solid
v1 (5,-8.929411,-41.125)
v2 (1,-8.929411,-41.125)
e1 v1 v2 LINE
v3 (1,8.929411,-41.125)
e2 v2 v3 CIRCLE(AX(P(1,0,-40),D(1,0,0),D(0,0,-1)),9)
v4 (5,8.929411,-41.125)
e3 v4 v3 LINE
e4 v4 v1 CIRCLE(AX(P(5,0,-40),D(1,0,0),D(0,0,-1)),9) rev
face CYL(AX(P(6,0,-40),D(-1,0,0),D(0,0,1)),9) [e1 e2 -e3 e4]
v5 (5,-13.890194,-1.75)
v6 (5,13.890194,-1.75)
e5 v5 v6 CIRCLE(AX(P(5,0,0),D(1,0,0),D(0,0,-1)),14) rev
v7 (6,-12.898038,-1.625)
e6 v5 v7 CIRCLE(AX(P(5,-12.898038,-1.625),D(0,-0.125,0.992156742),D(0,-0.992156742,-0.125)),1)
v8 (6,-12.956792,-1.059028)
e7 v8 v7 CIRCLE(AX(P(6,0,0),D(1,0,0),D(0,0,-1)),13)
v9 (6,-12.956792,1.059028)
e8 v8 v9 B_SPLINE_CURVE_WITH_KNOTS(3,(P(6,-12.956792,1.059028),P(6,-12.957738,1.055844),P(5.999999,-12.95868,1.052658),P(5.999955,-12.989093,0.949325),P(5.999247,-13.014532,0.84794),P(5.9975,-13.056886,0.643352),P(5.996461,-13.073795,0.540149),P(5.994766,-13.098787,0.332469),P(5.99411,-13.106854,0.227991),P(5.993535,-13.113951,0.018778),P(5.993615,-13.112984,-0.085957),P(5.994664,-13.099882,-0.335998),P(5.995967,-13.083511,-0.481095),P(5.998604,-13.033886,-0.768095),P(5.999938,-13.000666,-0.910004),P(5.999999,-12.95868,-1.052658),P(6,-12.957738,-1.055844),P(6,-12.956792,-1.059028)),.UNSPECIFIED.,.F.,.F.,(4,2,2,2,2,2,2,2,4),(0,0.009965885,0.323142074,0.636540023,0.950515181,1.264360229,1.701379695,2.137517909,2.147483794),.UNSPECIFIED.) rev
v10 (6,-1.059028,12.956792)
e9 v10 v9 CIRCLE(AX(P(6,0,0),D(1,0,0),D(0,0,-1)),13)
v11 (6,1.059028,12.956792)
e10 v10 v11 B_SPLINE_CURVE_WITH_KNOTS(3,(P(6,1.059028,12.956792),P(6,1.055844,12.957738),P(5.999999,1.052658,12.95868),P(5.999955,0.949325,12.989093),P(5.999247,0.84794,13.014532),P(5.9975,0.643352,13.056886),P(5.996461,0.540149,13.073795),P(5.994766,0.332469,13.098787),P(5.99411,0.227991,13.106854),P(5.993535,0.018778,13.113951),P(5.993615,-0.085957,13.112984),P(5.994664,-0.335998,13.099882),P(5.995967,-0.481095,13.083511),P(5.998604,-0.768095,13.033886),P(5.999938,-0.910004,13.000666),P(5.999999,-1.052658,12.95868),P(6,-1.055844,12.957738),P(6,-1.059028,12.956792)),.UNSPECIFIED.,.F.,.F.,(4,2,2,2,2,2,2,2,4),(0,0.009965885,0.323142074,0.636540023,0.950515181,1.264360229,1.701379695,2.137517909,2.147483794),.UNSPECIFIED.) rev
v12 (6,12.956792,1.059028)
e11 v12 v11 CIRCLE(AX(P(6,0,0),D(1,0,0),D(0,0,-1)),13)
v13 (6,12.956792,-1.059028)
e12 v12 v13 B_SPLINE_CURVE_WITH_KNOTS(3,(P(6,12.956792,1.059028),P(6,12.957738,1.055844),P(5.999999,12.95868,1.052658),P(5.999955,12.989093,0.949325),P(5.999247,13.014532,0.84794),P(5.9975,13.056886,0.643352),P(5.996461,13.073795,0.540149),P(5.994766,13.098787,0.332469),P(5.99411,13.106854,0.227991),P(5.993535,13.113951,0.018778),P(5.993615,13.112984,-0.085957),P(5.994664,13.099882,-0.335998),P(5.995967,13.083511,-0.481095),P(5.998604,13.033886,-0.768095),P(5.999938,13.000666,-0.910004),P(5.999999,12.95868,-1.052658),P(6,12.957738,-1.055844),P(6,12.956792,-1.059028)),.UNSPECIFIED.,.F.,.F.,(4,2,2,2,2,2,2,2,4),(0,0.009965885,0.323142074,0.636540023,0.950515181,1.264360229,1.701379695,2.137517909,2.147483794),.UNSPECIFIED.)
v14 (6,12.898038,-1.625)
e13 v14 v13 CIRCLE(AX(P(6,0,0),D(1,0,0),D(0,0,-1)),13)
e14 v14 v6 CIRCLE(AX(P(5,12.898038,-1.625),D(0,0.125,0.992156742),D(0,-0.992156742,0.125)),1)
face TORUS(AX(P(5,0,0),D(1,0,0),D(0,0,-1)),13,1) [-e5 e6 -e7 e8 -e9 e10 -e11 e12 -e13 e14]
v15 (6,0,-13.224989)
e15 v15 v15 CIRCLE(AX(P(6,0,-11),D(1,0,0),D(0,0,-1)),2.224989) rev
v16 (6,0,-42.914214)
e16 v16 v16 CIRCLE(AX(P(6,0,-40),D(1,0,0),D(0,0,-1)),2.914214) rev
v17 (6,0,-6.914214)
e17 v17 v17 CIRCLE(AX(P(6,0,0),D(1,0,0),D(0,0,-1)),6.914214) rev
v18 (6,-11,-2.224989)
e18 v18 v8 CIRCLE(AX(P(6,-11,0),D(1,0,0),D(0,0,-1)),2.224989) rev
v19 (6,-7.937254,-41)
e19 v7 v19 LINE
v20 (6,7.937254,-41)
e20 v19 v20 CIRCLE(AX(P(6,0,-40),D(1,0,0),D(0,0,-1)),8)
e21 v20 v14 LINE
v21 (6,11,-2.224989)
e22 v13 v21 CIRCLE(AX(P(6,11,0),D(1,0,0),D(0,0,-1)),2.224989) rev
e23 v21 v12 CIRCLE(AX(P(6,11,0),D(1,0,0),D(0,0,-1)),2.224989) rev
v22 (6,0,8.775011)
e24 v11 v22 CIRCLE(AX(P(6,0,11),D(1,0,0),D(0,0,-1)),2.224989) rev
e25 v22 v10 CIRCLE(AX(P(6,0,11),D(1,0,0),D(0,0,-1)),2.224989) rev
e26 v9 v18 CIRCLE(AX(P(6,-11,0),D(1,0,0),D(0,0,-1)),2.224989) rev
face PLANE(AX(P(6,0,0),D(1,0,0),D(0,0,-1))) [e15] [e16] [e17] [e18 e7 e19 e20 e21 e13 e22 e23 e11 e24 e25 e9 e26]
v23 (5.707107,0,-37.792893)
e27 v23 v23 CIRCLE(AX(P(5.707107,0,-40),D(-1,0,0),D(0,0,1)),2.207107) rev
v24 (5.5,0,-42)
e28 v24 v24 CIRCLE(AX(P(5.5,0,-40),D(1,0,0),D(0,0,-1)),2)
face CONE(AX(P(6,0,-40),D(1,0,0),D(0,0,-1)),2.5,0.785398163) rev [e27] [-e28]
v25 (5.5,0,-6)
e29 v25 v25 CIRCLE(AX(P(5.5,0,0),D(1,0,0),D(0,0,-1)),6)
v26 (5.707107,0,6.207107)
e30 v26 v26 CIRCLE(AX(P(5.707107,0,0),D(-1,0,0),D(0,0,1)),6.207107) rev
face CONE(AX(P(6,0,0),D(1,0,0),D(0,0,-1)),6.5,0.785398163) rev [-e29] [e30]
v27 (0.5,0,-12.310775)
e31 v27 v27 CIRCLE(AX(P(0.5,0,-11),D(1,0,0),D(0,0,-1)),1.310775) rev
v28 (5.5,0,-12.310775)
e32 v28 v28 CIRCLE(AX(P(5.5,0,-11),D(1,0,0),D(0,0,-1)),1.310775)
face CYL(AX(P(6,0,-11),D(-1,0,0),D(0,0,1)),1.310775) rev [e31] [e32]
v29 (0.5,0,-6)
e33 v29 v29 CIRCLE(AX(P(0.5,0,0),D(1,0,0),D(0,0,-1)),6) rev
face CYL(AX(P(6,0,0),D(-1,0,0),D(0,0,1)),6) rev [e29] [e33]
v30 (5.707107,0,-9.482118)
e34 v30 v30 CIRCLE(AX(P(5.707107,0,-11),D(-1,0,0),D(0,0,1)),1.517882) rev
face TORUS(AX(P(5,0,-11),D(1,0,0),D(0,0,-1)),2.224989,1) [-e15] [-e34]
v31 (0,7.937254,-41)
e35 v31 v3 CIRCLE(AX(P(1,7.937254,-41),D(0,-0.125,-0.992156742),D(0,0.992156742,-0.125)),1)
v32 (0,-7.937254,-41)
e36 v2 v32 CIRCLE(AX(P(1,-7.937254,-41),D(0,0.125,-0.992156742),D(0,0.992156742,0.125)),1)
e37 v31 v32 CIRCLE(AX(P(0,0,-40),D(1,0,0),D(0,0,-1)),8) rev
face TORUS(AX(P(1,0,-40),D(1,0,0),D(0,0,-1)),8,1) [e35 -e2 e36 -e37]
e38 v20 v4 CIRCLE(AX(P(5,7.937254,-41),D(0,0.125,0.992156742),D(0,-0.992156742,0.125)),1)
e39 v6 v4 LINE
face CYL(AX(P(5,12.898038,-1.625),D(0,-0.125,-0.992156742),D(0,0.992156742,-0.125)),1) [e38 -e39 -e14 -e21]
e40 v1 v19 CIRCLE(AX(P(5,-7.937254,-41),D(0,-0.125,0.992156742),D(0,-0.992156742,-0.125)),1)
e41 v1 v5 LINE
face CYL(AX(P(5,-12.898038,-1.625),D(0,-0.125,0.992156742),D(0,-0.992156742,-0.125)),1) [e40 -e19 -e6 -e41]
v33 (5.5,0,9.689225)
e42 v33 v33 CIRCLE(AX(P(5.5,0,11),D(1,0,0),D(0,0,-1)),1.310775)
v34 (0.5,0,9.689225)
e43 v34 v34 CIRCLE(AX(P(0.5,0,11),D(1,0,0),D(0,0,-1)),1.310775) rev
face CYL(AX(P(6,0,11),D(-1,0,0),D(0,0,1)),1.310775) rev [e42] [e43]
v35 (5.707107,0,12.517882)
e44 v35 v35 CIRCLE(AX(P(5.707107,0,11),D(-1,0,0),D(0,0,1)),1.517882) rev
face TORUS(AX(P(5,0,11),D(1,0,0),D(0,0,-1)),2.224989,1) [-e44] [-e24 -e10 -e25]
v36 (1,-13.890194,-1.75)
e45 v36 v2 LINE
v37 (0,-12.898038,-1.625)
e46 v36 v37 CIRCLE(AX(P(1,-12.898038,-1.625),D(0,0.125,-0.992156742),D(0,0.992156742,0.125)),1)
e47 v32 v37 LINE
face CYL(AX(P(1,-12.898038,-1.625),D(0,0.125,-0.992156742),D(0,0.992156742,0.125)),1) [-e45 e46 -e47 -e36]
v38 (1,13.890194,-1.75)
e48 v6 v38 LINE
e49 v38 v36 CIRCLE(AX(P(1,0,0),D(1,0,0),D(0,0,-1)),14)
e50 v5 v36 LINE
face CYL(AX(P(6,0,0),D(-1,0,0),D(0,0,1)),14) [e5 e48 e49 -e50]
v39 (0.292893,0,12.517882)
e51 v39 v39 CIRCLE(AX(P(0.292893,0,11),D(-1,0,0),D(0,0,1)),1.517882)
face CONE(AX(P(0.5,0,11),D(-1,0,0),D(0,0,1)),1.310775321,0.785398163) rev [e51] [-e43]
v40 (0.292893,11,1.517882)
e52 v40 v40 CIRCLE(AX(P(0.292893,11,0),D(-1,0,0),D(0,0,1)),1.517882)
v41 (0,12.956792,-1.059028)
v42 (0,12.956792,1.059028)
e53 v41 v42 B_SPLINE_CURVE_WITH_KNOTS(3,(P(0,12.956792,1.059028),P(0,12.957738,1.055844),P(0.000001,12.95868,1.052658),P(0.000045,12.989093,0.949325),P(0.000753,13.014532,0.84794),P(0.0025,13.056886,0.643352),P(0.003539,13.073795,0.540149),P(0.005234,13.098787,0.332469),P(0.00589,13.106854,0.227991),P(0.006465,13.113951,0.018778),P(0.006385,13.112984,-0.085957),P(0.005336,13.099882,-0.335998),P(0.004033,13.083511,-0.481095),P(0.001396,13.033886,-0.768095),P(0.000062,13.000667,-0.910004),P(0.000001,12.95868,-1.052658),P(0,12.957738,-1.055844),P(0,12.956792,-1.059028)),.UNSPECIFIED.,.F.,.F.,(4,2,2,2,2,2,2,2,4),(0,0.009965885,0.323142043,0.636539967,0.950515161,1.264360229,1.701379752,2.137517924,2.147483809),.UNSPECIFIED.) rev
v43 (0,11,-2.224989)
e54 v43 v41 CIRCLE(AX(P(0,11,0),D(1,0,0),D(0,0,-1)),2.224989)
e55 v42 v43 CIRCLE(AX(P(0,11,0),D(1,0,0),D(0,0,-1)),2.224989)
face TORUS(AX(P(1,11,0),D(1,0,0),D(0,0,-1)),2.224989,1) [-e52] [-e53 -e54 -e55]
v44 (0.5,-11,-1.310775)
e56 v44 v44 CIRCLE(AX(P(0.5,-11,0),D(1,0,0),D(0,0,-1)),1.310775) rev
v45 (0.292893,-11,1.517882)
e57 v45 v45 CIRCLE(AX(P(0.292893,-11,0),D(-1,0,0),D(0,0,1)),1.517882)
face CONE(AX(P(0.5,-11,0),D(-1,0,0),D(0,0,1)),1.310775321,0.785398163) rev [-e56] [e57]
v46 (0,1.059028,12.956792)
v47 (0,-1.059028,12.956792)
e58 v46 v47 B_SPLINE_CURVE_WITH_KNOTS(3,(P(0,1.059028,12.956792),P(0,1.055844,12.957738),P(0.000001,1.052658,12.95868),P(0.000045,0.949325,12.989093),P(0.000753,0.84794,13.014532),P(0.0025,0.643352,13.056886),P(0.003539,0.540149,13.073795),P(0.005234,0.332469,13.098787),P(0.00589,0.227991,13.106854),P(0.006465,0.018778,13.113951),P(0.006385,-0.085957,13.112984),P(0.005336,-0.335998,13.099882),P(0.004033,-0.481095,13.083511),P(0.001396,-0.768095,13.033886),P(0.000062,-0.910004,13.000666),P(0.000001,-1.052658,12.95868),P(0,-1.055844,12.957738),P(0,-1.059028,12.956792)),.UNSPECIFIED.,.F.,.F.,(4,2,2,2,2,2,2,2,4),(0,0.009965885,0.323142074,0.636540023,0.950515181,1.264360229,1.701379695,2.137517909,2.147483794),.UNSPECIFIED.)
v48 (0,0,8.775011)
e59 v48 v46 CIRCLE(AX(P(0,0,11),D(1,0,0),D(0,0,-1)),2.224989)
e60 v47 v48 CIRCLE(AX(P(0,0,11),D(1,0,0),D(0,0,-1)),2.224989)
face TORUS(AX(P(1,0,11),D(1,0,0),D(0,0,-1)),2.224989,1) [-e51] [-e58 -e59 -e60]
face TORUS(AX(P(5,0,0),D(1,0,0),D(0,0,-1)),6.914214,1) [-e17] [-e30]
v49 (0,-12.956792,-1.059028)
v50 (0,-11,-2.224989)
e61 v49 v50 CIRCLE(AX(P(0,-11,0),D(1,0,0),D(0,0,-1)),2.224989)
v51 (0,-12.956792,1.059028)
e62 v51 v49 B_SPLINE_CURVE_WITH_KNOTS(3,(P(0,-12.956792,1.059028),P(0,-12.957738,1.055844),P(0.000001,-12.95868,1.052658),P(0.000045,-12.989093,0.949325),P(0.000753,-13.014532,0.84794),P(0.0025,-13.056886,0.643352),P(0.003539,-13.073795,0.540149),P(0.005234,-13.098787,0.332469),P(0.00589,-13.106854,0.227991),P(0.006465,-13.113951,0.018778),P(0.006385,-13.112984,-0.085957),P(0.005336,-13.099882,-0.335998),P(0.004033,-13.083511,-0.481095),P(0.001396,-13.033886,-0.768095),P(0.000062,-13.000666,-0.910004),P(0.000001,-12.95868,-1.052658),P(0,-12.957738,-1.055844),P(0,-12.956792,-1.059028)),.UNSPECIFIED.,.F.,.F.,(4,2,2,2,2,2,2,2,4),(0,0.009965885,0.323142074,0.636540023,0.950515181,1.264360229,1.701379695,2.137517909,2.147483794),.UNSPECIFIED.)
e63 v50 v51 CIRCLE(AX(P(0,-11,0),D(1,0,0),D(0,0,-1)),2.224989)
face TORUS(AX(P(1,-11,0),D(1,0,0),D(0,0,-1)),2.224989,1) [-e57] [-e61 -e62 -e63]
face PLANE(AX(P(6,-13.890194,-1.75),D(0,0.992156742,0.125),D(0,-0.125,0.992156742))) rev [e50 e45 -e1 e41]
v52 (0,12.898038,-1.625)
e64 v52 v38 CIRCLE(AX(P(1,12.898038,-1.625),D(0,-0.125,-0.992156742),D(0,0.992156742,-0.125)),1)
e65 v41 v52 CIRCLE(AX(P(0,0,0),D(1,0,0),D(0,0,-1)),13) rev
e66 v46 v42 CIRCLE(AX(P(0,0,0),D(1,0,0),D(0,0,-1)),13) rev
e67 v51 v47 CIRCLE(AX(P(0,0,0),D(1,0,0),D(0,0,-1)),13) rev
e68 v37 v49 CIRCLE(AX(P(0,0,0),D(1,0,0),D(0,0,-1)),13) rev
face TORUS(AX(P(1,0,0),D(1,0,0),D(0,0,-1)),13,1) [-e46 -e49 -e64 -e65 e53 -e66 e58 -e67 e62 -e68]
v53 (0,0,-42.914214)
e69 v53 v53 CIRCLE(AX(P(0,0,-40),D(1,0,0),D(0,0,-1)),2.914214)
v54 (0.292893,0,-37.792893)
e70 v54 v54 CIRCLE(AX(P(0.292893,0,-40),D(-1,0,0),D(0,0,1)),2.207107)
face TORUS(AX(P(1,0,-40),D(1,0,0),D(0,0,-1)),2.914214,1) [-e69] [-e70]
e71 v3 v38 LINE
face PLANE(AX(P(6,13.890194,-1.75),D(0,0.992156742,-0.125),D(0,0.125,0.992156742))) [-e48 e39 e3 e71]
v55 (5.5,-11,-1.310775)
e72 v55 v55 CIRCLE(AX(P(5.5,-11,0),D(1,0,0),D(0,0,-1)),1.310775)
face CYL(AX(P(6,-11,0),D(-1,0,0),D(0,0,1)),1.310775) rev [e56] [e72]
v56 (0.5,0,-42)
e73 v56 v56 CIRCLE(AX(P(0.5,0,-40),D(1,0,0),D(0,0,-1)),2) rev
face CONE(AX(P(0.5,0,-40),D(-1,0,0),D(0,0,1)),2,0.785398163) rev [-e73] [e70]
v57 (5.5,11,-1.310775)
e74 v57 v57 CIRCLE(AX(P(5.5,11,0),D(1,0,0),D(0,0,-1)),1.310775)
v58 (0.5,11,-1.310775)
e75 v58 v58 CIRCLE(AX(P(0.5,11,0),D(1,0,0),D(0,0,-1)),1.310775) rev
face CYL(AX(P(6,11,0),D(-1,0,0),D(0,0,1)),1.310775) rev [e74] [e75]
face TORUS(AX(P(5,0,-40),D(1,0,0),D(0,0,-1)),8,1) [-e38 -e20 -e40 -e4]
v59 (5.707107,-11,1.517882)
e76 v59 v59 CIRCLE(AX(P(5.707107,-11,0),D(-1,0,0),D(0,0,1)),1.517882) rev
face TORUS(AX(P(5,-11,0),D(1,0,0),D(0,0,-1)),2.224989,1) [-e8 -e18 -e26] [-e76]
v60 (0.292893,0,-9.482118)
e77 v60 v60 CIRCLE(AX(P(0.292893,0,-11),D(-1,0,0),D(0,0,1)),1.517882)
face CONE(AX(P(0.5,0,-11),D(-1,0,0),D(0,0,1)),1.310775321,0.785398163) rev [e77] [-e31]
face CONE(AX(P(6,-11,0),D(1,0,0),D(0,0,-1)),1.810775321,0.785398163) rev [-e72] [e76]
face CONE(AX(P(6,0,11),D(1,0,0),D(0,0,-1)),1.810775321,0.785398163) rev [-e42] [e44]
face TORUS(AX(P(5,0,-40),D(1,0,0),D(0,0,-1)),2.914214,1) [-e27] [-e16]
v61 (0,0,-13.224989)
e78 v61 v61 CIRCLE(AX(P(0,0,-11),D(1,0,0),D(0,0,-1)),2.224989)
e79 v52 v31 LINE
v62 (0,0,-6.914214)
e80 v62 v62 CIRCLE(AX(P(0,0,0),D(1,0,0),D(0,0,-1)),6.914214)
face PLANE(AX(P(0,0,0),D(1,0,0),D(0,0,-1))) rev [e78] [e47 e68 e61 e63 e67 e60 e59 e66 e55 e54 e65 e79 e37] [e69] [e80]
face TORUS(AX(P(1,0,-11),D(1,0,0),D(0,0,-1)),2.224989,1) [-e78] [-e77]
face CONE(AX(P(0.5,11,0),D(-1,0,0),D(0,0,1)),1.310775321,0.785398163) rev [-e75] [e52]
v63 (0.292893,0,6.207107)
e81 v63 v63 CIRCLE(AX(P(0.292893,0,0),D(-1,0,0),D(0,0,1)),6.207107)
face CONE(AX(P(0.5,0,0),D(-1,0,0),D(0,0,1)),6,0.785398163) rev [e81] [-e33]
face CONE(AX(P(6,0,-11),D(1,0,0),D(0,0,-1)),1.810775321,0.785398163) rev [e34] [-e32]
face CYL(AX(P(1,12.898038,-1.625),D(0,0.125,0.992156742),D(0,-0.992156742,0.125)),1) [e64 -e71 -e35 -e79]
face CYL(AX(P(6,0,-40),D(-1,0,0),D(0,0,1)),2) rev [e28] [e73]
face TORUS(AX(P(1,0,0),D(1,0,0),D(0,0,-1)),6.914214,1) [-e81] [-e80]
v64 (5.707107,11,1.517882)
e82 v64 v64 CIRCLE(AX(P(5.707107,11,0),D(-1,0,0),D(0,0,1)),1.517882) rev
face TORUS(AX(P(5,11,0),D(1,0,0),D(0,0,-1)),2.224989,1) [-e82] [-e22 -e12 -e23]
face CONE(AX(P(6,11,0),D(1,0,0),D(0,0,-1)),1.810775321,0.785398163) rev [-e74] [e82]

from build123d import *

# Parameters (mm, degrees)
EXTRUDE_1_DEPTH      = 6
SKETCH_2_OUTSIDE_W   = 78.84
SKETCH_2_OUTSIDE_H   = 43.84
SKETCH_2_OUTSIDE_R   = 6
SKETCH_2_OUTSIDE_R_2 = 1.310775321
SKETCH_2_OUTSIDE_R_3 = 2
CUT_EXTRUDE_1_DEPTH  = 52.312766443
CHAMFER_1_SIZE       = 0.5
FILLET_1_R           = 1


with BuildPart() as part:
    # 草图1 → 凸台-拉伸1 (new body)
    with BuildSketch(Plane(origin=(0, 0, 0), x_dir=(0, 0, -1), z_dir=(1, 0, 0))):
        with BuildLine():
            Line((41.125, 8.929410675), (1.75, 13.890194383))
            ThreePointArc((1.75, 13.890194383), (-14, 0), (1.75, -13.890194383))
            Line((1.75, -13.890194383), (41.125, -8.929410675))
            ThreePointArc((41.125, -8.929410675), (49, 0), (41.125, 8.929410675))
        make_face()
    extrude(amount=EXTRUDE_1_DEPTH)

    # 草图2 outside → 切除-拉伸1 (cut, through all)
    # profile 1 of 7: a face of its own
    with BuildSketch(Plane.ZY):
        with Locations((-17.5, 0)):
            Rectangle(SKETCH_2_OUTSIDE_W, SKETCH_2_OUTSIDE_H)
        with BuildLine():
            Line((-41.125, -8.929410675), (-1.75, -13.890194383))
            ThreePointArc((-1.75, -13.890194383), (14, 0), (-1.75, 13.890194383))
            Line((-1.75, 13.890194383), (-41.125, 8.929410675))
            ThreePointArc((-41.125, 8.929410675), (-49, 0), (-41.125, -8.929410675))
        make_face(mode=Mode.SUBTRACT)
    # profile 2 of 7: a face of its own
    with BuildSketch(Plane.ZY):
        Circle(SKETCH_2_OUTSIDE_R)
    # profile 3 of 7: a face of its own
    with BuildSketch(Plane.ZY):
        with Locations((11, 0)):
            Circle(SKETCH_2_OUTSIDE_R_2)
    # profile 4 of 7: a face of its own
    with BuildSketch(Plane.ZY):
        with Locations((0, -11)):
            Circle(SKETCH_2_OUTSIDE_R_2)
    # profile 5 of 7: a face of its own
    with BuildSketch(Plane.ZY):
        with Locations((-11, 0)):
            Circle(SKETCH_2_OUTSIDE_R_2)
    # profile 6 of 7: a face of its own
    with BuildSketch(Plane.ZY):
        with Locations((0, 11)):
            Circle(SKETCH_2_OUTSIDE_R_2)
    # profile 7 of 7: a face of its own
    with BuildSketch(Plane.ZY):
        with Locations((-40, 0)):
            Circle(SKETCH_2_OUTSIDE_R_3)
    extrude(amount=-CUT_EXTRUDE_1_DEPTH, mode=Mode.SUBTRACT)

    # 倒角1
    chamfer_1_edges = [part.edges().sort_by_distance(p)[0] for p in [
        (6, 11, -1.310775321),
        (0, 11, -1.310775321),
        (6, 0, -12.310775321),
        (0, 0, -12.310775321),
        (6, -11, -1.310775321),
        (0, -11, -1.310775321),
        (6, 0, 9.689224679),
        (0, 0, 9.689224679),
        (6, 0, -42),
        (0, 0, -42),
        (6, 0, -6),
        (0, 0, -6),
    ]]
    chamfer(chamfer_1_edges, length=CHAMFER_1_SIZE)

    # 圆角1
    # the kernel refuses this fillet: 1 mm, written as the material it takes off along each edge
    with BuildSketch(Plane(origin=(6, 0, -40), x_dir=(0, -0.9921567416492214, -0.125), z_dir=(0, -0.125, 0.9921567416492214))) as fillet_1_piece_1:
        with BuildLine():
            CenterArc((9 - FILLET_1_R, -FILLET_1_R), FILLET_1_R, 0, 90)
            Line((9 - FILLET_1_R, 0), (9, 0))
            Line((9, 0), (9, -FILLET_1_R))
        make_face()
    revolve(axis=Axis((6, 0, -40), (1, 0, 0)), revolution_arc=165.638488437, mode=Mode.SUBTRACT)
    with BuildSketch(Plane(origin=(6, 8.929410675, -41.125), x_dir=(-1, 0, 0), z_dir=(0, 0.12499999999999993, 0.9921567416492215)), Plane(origin=(6, -13.890194383, -1.75), x_dir=(-1, 0, 0), z_dir=(0, 0.12500000000000006, -0.9921567416492215)), Plane(origin=(0, 8.929410675, -41.125), x_dir=(0, -0.9921567416492216, 0.12499999999999994), z_dir=(0, 0.12499999999999993, 0.9921567416492215)), Plane(origin=(0, -13.890194383, -1.75), x_dir=(0, 0.9921567416492215, 0.12500000000000006), z_dir=(0, 0.12500000000000006, -0.9921567416492215))) as fillet_1_piece_2:
        with BuildLine():
            CenterArc((FILLET_1_R, FILLET_1_R), FILLET_1_R, 180, 90)
            Line((0, FILLET_1_R), (0, 0))
            Line((0, 0), (FILLET_1_R, 0))
        make_face()
    extrude(amount=39.686269666, mode=Mode.SUBTRACT)
    with BuildSketch(Plane(origin=(6, 0, 0), x_dir=(0, 0.9921567416492215, -0.12500000000000014), z_dir=(0, -0.12500000000000014, -0.9921567416492215))) as fillet_1_piece_3:
        with BuildLine():
            CenterArc((14 - FILLET_1_R, -FILLET_1_R), FILLET_1_R, 0, 90)
            Line((14 - FILLET_1_R, 0), (14, 0))
            Line((14, 0), (14, -FILLET_1_R))
        make_face()
    revolve(axis=Axis((6, 0, 0), (1, 0, 0)), revolution_arc=194.361511563, mode=Mode.SUBTRACT)
    with BuildSketch(Plane(origin=(0, 0, 0), x_dir=(0, 0.9921567416492215, -0.12500000000000014), z_dir=(0, -0.12500000000000014, -0.9921567416492215))) as fillet_1_piece_4:
        with BuildLine():
            CenterArc((14 - FILLET_1_R, FILLET_1_R), FILLET_1_R, 270, 90)
            Line((14, FILLET_1_R), (14, 0))
            Line((14, 0), (14 - FILLET_1_R, 0))
        make_face()
    revolve(axis=Axis((0, 0, 0), (1, 0, 0)), revolution_arc=194.361511563, mode=Mode.SUBTRACT)
    with BuildSketch(Plane(origin=(0, 0, -40), x_dir=(0, 0, 1), z_dir=(0, -1, 0))) as fillet_1_piece_5:
        with BuildLine():
            CenterArc((2.5 + FILLET_1_R * 0.414213562373, -FILLET_1_R), FILLET_1_R, 90, 45)
            Line((2.5 - FILLET_1_R * 0.292893218813, -FILLET_1_R * 0.292893218813), (2.5, 0))
            Line((2.5, 0), (2.5 + FILLET_1_R * 0.414213562373, 0))
        make_face()
    revolve(axis=Axis((0, 0, -40), (-1, 0, 0)), mode=Mode.SUBTRACT)
    with BuildSketch(Plane(origin=(0, 0, -11), x_dir=(0, 0, 1), z_dir=(0, -1, 0))) as fillet_1_piece_6:
        with BuildLine():
            CenterArc((1.810775321 + FILLET_1_R * 0.414213562373, -FILLET_1_R), FILLET_1_R, 90, 45)
            Line((1.810775321 - FILLET_1_R * 0.292893218813, -FILLET_1_R * 0.292893218813), (1.810775321, 0))
            Line((1.810775321, 0), (1.810775321 + FILLET_1_R * 0.414213562373, 0))
        make_face()
    revolve(axis=Axis((0, 0, -11), (-1, 0, 0)), mode=Mode.SUBTRACT)
    with BuildSketch(Plane(origin=(0, 0, 0), x_dir=(0, 0, 1), z_dir=(0, -1, 0))) as fillet_1_piece_7:
        with BuildLine():
            CenterArc((6.5 + FILLET_1_R * 0.414213562373, -FILLET_1_R), FILLET_1_R, 90, 45)
            Line((6.5 - FILLET_1_R * 0.292893218813, -FILLET_1_R * 0.292893218813), (6.5, 0))
            Line((6.5, 0), (6.5 + FILLET_1_R * 0.414213562373, 0))
        make_face()
    revolve(axis=Axis((0, 0, 0), (-1, 0, 0)), mode=Mode.SUBTRACT)
    with BuildSketch(Plane(origin=(0, 11, 0), x_dir=(0, 0, 1), z_dir=(0, -1, 0))) as fillet_1_piece_8:
        with BuildLine():
            CenterArc((1.810775321 + FILLET_1_R * 0.414213562373, -FILLET_1_R), FILLET_1_R, 90, 45)
            Line((1.810775321 - FILLET_1_R * 0.292893218813, -FILLET_1_R * 0.292893218813), (1.810775321, 0))
            Line((1.810775321, 0), (1.810775321 + FILLET_1_R * 0.414213562373, 0))
        make_face()
    revolve(axis=Axis((0, 11, 0), (-1, 0, 0)), mode=Mode.SUBTRACT)
    with BuildSketch(Plane(origin=(0, -11, 0), x_dir=(0, 0, 1), z_dir=(0, -1, 0))) as fillet_1_piece_9:
        with BuildLine():
            CenterArc((1.810775321 + FILLET_1_R * 0.414213562373, -FILLET_1_R), FILLET_1_R, 90, 45)
            Line((1.810775321 - FILLET_1_R * 0.292893218813, -FILLET_1_R * 0.292893218813), (1.810775321, 0))
            Line((1.810775321, 0), (1.810775321 + FILLET_1_R * 0.414213562373, 0))
        make_face()
    revolve(axis=Axis((0, -11, 0), (-1, 0, 0)), mode=Mode.SUBTRACT)
    with BuildSketch(Plane(origin=(0, 0, 11), x_dir=(0, 0, 1), z_dir=(0, -1, 0))) as fillet_1_piece_10:
        with BuildLine():
            CenterArc((1.810775321 + FILLET_1_R * 0.414213562373, -FILLET_1_R), FILLET_1_R, 90, 45)
            Line((1.810775321 - FILLET_1_R * 0.292893218813, -FILLET_1_R * 0.292893218813), (1.810775321, 0))
            Line((1.810775321, 0), (1.810775321 + FILLET_1_R * 0.414213562373, 0))
        make_face()
    revolve(axis=Axis((0, 0, 11), (-1, 0, 0)), mode=Mode.SUBTRACT)
    with BuildSketch(Plane(origin=(6, 0, -40), x_dir=(0, 0, 1), z_dir=(0, -1, 0))) as fillet_1_piece_11:
        with BuildLine():
            CenterArc((2.5 + FILLET_1_R * 0.414213562373, FILLET_1_R), FILLET_1_R, 225, 45)
            Line((2.5 - FILLET_1_R * 0.292893218813, FILLET_1_R * 0.292893218813), (2.5, 0))
            Line((2.5, 0), (2.5 + FILLET_1_R * 0.414213562373, 0))
        make_face()
    revolve(axis=Axis((6, 0, -40), (-1, 0, 0)), mode=Mode.SUBTRACT)
    with BuildSketch(Plane(origin=(6, 0, -11), x_dir=(0, 0, 1), z_dir=(0, -1, 0))) as fillet_1_piece_12:
        with BuildLine():
            CenterArc((1.810775321 + FILLET_1_R * 0.414213562373, FILLET_1_R), FILLET_1_R, 225, 45)
            Line((1.810775321 - FILLET_1_R * 0.292893218813, FILLET_1_R * 0.292893218813), (1.810775321, 0))
            Line((1.810775321, 0), (1.810775321 + FILLET_1_R * 0.414213562373, 0))
        make_face()
    revolve(axis=Axis((6, 0, -11), (-1, 0, 0)), mode=Mode.SUBTRACT)
    with BuildSketch(Plane(origin=(6, 0, 0), x_dir=(0, 0, 1), z_dir=(0, -1, 0))) as fillet_1_piece_13:
        with BuildLine():
            CenterArc((6.5 + FILLET_1_R * 0.414213562373, FILLET_1_R), FILLET_1_R, 225, 45)
            Line((6.5 - FILLET_1_R * 0.292893218813, FILLET_1_R * 0.292893218813), (6.5, 0))
            Line((6.5, 0), (6.5 + FILLET_1_R * 0.414213562373, 0))
        make_face()
    revolve(axis=Axis((6, 0, 0), (-1, 0, 0)), mode=Mode.SUBTRACT)
    with BuildSketch(Plane(origin=(6, 11, 0), x_dir=(0, 0, 1), z_dir=(0, -1, 0))) as fillet_1_piece_14:
        with BuildLine():
            CenterArc((1.810775321 + FILLET_1_R * 0.414213562373, FILLET_1_R), FILLET_1_R, 225, 45)
            Line((1.810775321 - FILLET_1_R * 0.292893218813, FILLET_1_R * 0.292893218813), (1.810775321, 0))
            Line((1.810775321, 0), (1.810775321 + FILLET_1_R * 0.414213562373, 0))
        make_face()
    revolve(axis=Axis((6, 11, 0), (-1, 0, 0)), mode=Mode.SUBTRACT)
    with BuildSketch(Plane(origin=(6, -11, 0), x_dir=(0, 0, 1), z_dir=(0, -1, 0))) as fillet_1_piece_15:
        with BuildLine():
            CenterArc((1.810775321 + FILLET_1_R * 0.414213562373, FILLET_1_R), FILLET_1_R, 225, 45)
            Line((1.810775321 - FILLET_1_R * 0.292893218813, FILLET_1_R * 0.292893218813), (1.810775321, 0))
            Line((1.810775321, 0), (1.810775321 + FILLET_1_R * 0.414213562373, 0))
        make_face()
    revolve(axis=Axis((6, -11, 0), (-1, 0, 0)), mode=Mode.SUBTRACT)
    with BuildSketch(Plane(origin=(6, 0, 11), x_dir=(0, 0, 1), z_dir=(0, -1, 0))) as fillet_1_piece_16:
        with BuildLine():
            CenterArc((1.810775321 + FILLET_1_R * 0.414213562373, FILLET_1_R), FILLET_1_R, 225, 45)
            Line((1.810775321 - FILLET_1_R * 0.292893218813, FILLET_1_R * 0.292893218813), (1.810775321, 0))
            Line((1.810775321, 0), (1.810775321 + FILLET_1_R * 0.414213562373, 0))
        make_face()
    revolve(axis=Axis((6, 0, 11), (-1, 0, 0)), mode=Mode.SUBTRACT)
    with BuildSketch(Plane(origin=(0, 0, -40), x_dir=(0, -0.9921567416492214, -0.125), z_dir=(0, -0.125, 0.9921567416492214))) as fillet_1_piece_17:
        with BuildLine():
            CenterArc((9 - FILLET_1_R, FILLET_1_R), FILLET_1_R, 270, 90)
            Line((9, FILLET_1_R), (9, 0))
            Line((9, 0), (9 - FILLET_1_R, 0))
        make_face()
    revolve(axis=Axis((0, 0, -40), (1, 0, 0)), revolution_arc=165.638488437, mode=Mode.SUBTRACT)


solid = part.part
